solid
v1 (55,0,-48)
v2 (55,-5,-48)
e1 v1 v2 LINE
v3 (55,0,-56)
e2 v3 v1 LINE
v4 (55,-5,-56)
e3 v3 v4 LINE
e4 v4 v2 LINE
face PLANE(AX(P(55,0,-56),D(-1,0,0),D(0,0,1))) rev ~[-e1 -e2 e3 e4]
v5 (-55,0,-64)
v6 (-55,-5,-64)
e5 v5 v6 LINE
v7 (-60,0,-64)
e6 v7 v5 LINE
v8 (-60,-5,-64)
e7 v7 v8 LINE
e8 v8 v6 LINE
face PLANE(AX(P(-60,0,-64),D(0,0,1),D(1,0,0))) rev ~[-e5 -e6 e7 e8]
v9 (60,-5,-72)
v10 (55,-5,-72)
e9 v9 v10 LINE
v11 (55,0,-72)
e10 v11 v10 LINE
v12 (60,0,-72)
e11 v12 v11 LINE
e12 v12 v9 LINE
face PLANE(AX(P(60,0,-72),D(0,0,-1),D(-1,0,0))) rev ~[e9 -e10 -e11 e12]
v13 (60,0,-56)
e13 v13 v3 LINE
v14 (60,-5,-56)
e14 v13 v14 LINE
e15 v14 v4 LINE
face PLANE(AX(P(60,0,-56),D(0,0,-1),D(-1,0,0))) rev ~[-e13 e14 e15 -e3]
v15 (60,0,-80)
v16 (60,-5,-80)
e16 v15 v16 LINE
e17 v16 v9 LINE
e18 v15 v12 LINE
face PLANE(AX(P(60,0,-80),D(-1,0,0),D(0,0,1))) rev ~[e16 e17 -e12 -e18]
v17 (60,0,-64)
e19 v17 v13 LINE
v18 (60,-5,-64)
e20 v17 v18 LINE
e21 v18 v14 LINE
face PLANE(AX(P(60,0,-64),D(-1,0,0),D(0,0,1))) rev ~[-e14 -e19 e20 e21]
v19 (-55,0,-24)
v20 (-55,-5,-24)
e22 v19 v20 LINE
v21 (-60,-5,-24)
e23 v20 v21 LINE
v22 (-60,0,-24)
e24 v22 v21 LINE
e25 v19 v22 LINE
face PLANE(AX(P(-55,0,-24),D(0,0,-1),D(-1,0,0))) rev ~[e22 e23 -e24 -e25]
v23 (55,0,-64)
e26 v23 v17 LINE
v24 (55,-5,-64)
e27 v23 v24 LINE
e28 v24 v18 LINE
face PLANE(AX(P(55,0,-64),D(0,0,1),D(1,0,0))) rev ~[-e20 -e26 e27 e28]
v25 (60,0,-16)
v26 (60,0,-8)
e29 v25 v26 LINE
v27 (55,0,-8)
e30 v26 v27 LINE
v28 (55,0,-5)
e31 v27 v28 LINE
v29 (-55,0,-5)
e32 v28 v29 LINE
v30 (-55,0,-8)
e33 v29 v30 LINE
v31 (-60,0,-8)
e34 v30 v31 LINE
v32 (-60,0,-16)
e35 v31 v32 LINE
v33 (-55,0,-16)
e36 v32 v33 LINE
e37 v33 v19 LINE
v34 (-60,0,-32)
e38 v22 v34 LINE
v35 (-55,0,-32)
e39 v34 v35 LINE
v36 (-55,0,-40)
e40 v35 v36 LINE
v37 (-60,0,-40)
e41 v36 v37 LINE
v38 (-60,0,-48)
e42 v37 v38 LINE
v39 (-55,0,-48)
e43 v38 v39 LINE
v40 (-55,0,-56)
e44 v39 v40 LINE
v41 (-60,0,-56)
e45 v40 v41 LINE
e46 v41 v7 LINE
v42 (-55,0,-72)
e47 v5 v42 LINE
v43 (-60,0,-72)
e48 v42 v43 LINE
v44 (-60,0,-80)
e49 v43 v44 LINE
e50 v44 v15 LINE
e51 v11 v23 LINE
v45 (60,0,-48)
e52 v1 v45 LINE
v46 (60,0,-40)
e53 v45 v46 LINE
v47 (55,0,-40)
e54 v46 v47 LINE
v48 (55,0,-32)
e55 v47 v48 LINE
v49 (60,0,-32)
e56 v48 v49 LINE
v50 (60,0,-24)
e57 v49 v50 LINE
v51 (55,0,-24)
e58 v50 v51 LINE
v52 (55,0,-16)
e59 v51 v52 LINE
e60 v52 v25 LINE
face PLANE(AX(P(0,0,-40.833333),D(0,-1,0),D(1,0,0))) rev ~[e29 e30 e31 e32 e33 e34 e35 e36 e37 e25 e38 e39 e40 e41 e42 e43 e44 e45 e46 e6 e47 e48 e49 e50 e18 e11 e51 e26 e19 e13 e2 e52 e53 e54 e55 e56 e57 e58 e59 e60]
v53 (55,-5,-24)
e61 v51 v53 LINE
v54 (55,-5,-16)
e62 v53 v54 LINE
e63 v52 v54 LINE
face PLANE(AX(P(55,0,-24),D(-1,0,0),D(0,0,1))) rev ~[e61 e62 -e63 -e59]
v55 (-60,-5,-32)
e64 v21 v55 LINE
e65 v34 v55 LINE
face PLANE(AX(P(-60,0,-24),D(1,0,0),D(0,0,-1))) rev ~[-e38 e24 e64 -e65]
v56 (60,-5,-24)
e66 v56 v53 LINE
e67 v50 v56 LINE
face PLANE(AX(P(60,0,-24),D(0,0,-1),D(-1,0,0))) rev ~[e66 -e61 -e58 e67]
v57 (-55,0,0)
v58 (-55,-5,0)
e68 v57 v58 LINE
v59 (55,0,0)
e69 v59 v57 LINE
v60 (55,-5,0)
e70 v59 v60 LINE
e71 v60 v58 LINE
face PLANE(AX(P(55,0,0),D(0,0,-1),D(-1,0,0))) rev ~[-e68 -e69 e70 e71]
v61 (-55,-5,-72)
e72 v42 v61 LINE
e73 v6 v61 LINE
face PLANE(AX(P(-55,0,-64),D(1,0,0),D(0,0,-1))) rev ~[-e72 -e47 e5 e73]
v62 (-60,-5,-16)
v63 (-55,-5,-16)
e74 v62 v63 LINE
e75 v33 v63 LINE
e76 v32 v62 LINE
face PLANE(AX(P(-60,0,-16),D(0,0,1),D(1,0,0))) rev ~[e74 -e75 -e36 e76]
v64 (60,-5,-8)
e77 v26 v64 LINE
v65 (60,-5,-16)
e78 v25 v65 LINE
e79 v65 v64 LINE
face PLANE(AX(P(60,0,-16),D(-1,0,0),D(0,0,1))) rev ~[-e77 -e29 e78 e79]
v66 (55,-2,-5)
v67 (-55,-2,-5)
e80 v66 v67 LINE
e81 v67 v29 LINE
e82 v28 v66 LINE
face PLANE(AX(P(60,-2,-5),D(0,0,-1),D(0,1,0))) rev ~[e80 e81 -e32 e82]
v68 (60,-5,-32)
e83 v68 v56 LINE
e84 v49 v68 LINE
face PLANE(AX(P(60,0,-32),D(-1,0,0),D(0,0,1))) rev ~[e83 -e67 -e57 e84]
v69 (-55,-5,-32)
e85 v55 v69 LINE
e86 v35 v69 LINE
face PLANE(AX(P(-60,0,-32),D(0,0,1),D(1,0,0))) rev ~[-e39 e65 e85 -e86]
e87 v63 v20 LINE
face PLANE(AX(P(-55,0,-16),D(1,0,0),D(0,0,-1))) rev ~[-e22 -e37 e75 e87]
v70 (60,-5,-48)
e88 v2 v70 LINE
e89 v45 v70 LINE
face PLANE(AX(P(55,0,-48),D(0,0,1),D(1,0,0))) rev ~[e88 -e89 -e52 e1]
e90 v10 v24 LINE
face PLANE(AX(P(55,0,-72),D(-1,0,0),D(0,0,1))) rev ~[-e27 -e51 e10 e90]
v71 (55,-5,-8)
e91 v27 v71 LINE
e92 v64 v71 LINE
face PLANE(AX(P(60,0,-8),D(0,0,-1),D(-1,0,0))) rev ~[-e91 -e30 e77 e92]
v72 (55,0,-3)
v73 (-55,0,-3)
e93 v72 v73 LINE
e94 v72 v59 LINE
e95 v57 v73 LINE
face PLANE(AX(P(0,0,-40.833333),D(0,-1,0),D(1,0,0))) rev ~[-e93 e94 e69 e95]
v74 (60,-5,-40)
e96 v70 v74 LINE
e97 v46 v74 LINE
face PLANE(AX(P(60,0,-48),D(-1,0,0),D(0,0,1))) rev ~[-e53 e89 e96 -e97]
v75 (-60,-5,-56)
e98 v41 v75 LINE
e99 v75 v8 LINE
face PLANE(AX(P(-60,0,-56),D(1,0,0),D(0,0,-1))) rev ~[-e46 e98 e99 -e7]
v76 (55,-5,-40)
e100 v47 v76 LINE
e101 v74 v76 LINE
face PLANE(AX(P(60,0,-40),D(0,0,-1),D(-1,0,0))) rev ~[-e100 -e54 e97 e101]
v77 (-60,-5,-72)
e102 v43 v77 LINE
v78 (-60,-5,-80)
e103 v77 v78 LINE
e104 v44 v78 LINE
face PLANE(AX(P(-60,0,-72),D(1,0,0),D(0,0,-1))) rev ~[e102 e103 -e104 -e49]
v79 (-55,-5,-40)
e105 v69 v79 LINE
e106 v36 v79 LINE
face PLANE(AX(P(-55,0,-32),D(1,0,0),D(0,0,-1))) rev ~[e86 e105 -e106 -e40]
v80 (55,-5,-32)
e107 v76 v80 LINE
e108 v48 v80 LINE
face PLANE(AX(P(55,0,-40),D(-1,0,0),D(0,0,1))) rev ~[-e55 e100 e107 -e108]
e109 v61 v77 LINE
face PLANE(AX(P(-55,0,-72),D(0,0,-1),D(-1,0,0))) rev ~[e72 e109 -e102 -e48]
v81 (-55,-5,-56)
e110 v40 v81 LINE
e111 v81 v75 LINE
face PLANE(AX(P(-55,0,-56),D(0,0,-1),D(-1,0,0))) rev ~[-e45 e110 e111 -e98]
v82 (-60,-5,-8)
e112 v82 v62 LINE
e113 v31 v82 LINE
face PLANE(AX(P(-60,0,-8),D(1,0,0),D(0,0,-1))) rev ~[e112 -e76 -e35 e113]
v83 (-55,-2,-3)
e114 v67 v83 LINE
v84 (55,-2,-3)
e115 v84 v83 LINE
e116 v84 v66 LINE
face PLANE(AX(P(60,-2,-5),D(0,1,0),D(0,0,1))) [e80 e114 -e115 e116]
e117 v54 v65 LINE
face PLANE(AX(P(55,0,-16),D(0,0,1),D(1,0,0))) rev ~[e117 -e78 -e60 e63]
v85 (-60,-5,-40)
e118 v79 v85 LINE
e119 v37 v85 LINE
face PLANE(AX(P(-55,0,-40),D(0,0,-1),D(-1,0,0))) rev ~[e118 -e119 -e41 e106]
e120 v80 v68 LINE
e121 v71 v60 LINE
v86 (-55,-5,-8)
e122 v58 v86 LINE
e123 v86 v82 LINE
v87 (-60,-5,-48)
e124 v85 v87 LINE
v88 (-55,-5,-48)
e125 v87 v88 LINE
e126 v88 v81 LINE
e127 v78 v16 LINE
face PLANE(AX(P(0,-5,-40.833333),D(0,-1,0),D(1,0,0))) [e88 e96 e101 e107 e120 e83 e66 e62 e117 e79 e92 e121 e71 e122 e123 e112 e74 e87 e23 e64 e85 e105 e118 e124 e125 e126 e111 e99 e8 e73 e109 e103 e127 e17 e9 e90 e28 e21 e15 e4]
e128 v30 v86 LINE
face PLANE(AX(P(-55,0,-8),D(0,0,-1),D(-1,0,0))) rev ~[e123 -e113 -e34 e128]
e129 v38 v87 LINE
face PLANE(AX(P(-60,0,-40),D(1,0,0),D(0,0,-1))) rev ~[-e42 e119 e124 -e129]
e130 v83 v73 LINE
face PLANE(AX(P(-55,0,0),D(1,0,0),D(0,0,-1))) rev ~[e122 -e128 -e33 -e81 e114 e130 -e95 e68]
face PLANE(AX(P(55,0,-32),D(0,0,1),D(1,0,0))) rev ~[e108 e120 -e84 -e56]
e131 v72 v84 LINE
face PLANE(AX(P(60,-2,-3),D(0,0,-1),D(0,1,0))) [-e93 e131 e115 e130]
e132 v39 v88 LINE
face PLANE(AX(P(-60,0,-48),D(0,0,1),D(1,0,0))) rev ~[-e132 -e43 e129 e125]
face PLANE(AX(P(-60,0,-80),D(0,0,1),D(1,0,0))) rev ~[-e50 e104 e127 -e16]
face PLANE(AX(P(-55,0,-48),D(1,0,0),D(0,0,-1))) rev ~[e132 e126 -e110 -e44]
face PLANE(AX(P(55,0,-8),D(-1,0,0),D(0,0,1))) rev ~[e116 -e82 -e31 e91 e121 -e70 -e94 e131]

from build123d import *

# Parameters (mm, degrees)
F2_DEPTH = 5
F3_W     = 2
F3_H     = 2
F4_DEPTH = 120.001


# Not quite as in the source:
# - a feature names something its author has since deleted; it is built from what else it names


with BuildPart() as f2:
    # F1 (on Front) → F2 (new body)
    with BuildSketch(Plane.XZ):
        Polygon((55, -8), (55, 0), (-55, 0), (-55, -8), (-60, -8), (-60, -16), (-55, -16), (-55, -24), (-60, -24), (-60, -32), (-55, -32), (-55, -40), (-60, -40), (-60, -48), (-55, -48), (-55, -56), (-60, -56), (-60, -64), (-55, -64), (-55, -72), (-60, -72), (-60, -80), (60, -80), (60, -72), (55, -72), (55, -64), (60, -64), (60, -56), (55, -56), (55, -48), (60, -48), (60, -40), (55, -40), (55, -32), (60, -32), (60, -24), (55, -24), (55, -16), (60, -16), (60, -8), align=None)
    extrude(amount=F2_DEPTH)

    # F3 (on face) → F4 (cut, through all)
    with BuildSketch(Plane.YZ.offset(60)):
        with Locations((-1, -4)):
            Rectangle(F3_W, F3_H)
    extrude(amount=-F4_DEPTH, mode=Mode.SUBTRACT)


solid = f2.part
